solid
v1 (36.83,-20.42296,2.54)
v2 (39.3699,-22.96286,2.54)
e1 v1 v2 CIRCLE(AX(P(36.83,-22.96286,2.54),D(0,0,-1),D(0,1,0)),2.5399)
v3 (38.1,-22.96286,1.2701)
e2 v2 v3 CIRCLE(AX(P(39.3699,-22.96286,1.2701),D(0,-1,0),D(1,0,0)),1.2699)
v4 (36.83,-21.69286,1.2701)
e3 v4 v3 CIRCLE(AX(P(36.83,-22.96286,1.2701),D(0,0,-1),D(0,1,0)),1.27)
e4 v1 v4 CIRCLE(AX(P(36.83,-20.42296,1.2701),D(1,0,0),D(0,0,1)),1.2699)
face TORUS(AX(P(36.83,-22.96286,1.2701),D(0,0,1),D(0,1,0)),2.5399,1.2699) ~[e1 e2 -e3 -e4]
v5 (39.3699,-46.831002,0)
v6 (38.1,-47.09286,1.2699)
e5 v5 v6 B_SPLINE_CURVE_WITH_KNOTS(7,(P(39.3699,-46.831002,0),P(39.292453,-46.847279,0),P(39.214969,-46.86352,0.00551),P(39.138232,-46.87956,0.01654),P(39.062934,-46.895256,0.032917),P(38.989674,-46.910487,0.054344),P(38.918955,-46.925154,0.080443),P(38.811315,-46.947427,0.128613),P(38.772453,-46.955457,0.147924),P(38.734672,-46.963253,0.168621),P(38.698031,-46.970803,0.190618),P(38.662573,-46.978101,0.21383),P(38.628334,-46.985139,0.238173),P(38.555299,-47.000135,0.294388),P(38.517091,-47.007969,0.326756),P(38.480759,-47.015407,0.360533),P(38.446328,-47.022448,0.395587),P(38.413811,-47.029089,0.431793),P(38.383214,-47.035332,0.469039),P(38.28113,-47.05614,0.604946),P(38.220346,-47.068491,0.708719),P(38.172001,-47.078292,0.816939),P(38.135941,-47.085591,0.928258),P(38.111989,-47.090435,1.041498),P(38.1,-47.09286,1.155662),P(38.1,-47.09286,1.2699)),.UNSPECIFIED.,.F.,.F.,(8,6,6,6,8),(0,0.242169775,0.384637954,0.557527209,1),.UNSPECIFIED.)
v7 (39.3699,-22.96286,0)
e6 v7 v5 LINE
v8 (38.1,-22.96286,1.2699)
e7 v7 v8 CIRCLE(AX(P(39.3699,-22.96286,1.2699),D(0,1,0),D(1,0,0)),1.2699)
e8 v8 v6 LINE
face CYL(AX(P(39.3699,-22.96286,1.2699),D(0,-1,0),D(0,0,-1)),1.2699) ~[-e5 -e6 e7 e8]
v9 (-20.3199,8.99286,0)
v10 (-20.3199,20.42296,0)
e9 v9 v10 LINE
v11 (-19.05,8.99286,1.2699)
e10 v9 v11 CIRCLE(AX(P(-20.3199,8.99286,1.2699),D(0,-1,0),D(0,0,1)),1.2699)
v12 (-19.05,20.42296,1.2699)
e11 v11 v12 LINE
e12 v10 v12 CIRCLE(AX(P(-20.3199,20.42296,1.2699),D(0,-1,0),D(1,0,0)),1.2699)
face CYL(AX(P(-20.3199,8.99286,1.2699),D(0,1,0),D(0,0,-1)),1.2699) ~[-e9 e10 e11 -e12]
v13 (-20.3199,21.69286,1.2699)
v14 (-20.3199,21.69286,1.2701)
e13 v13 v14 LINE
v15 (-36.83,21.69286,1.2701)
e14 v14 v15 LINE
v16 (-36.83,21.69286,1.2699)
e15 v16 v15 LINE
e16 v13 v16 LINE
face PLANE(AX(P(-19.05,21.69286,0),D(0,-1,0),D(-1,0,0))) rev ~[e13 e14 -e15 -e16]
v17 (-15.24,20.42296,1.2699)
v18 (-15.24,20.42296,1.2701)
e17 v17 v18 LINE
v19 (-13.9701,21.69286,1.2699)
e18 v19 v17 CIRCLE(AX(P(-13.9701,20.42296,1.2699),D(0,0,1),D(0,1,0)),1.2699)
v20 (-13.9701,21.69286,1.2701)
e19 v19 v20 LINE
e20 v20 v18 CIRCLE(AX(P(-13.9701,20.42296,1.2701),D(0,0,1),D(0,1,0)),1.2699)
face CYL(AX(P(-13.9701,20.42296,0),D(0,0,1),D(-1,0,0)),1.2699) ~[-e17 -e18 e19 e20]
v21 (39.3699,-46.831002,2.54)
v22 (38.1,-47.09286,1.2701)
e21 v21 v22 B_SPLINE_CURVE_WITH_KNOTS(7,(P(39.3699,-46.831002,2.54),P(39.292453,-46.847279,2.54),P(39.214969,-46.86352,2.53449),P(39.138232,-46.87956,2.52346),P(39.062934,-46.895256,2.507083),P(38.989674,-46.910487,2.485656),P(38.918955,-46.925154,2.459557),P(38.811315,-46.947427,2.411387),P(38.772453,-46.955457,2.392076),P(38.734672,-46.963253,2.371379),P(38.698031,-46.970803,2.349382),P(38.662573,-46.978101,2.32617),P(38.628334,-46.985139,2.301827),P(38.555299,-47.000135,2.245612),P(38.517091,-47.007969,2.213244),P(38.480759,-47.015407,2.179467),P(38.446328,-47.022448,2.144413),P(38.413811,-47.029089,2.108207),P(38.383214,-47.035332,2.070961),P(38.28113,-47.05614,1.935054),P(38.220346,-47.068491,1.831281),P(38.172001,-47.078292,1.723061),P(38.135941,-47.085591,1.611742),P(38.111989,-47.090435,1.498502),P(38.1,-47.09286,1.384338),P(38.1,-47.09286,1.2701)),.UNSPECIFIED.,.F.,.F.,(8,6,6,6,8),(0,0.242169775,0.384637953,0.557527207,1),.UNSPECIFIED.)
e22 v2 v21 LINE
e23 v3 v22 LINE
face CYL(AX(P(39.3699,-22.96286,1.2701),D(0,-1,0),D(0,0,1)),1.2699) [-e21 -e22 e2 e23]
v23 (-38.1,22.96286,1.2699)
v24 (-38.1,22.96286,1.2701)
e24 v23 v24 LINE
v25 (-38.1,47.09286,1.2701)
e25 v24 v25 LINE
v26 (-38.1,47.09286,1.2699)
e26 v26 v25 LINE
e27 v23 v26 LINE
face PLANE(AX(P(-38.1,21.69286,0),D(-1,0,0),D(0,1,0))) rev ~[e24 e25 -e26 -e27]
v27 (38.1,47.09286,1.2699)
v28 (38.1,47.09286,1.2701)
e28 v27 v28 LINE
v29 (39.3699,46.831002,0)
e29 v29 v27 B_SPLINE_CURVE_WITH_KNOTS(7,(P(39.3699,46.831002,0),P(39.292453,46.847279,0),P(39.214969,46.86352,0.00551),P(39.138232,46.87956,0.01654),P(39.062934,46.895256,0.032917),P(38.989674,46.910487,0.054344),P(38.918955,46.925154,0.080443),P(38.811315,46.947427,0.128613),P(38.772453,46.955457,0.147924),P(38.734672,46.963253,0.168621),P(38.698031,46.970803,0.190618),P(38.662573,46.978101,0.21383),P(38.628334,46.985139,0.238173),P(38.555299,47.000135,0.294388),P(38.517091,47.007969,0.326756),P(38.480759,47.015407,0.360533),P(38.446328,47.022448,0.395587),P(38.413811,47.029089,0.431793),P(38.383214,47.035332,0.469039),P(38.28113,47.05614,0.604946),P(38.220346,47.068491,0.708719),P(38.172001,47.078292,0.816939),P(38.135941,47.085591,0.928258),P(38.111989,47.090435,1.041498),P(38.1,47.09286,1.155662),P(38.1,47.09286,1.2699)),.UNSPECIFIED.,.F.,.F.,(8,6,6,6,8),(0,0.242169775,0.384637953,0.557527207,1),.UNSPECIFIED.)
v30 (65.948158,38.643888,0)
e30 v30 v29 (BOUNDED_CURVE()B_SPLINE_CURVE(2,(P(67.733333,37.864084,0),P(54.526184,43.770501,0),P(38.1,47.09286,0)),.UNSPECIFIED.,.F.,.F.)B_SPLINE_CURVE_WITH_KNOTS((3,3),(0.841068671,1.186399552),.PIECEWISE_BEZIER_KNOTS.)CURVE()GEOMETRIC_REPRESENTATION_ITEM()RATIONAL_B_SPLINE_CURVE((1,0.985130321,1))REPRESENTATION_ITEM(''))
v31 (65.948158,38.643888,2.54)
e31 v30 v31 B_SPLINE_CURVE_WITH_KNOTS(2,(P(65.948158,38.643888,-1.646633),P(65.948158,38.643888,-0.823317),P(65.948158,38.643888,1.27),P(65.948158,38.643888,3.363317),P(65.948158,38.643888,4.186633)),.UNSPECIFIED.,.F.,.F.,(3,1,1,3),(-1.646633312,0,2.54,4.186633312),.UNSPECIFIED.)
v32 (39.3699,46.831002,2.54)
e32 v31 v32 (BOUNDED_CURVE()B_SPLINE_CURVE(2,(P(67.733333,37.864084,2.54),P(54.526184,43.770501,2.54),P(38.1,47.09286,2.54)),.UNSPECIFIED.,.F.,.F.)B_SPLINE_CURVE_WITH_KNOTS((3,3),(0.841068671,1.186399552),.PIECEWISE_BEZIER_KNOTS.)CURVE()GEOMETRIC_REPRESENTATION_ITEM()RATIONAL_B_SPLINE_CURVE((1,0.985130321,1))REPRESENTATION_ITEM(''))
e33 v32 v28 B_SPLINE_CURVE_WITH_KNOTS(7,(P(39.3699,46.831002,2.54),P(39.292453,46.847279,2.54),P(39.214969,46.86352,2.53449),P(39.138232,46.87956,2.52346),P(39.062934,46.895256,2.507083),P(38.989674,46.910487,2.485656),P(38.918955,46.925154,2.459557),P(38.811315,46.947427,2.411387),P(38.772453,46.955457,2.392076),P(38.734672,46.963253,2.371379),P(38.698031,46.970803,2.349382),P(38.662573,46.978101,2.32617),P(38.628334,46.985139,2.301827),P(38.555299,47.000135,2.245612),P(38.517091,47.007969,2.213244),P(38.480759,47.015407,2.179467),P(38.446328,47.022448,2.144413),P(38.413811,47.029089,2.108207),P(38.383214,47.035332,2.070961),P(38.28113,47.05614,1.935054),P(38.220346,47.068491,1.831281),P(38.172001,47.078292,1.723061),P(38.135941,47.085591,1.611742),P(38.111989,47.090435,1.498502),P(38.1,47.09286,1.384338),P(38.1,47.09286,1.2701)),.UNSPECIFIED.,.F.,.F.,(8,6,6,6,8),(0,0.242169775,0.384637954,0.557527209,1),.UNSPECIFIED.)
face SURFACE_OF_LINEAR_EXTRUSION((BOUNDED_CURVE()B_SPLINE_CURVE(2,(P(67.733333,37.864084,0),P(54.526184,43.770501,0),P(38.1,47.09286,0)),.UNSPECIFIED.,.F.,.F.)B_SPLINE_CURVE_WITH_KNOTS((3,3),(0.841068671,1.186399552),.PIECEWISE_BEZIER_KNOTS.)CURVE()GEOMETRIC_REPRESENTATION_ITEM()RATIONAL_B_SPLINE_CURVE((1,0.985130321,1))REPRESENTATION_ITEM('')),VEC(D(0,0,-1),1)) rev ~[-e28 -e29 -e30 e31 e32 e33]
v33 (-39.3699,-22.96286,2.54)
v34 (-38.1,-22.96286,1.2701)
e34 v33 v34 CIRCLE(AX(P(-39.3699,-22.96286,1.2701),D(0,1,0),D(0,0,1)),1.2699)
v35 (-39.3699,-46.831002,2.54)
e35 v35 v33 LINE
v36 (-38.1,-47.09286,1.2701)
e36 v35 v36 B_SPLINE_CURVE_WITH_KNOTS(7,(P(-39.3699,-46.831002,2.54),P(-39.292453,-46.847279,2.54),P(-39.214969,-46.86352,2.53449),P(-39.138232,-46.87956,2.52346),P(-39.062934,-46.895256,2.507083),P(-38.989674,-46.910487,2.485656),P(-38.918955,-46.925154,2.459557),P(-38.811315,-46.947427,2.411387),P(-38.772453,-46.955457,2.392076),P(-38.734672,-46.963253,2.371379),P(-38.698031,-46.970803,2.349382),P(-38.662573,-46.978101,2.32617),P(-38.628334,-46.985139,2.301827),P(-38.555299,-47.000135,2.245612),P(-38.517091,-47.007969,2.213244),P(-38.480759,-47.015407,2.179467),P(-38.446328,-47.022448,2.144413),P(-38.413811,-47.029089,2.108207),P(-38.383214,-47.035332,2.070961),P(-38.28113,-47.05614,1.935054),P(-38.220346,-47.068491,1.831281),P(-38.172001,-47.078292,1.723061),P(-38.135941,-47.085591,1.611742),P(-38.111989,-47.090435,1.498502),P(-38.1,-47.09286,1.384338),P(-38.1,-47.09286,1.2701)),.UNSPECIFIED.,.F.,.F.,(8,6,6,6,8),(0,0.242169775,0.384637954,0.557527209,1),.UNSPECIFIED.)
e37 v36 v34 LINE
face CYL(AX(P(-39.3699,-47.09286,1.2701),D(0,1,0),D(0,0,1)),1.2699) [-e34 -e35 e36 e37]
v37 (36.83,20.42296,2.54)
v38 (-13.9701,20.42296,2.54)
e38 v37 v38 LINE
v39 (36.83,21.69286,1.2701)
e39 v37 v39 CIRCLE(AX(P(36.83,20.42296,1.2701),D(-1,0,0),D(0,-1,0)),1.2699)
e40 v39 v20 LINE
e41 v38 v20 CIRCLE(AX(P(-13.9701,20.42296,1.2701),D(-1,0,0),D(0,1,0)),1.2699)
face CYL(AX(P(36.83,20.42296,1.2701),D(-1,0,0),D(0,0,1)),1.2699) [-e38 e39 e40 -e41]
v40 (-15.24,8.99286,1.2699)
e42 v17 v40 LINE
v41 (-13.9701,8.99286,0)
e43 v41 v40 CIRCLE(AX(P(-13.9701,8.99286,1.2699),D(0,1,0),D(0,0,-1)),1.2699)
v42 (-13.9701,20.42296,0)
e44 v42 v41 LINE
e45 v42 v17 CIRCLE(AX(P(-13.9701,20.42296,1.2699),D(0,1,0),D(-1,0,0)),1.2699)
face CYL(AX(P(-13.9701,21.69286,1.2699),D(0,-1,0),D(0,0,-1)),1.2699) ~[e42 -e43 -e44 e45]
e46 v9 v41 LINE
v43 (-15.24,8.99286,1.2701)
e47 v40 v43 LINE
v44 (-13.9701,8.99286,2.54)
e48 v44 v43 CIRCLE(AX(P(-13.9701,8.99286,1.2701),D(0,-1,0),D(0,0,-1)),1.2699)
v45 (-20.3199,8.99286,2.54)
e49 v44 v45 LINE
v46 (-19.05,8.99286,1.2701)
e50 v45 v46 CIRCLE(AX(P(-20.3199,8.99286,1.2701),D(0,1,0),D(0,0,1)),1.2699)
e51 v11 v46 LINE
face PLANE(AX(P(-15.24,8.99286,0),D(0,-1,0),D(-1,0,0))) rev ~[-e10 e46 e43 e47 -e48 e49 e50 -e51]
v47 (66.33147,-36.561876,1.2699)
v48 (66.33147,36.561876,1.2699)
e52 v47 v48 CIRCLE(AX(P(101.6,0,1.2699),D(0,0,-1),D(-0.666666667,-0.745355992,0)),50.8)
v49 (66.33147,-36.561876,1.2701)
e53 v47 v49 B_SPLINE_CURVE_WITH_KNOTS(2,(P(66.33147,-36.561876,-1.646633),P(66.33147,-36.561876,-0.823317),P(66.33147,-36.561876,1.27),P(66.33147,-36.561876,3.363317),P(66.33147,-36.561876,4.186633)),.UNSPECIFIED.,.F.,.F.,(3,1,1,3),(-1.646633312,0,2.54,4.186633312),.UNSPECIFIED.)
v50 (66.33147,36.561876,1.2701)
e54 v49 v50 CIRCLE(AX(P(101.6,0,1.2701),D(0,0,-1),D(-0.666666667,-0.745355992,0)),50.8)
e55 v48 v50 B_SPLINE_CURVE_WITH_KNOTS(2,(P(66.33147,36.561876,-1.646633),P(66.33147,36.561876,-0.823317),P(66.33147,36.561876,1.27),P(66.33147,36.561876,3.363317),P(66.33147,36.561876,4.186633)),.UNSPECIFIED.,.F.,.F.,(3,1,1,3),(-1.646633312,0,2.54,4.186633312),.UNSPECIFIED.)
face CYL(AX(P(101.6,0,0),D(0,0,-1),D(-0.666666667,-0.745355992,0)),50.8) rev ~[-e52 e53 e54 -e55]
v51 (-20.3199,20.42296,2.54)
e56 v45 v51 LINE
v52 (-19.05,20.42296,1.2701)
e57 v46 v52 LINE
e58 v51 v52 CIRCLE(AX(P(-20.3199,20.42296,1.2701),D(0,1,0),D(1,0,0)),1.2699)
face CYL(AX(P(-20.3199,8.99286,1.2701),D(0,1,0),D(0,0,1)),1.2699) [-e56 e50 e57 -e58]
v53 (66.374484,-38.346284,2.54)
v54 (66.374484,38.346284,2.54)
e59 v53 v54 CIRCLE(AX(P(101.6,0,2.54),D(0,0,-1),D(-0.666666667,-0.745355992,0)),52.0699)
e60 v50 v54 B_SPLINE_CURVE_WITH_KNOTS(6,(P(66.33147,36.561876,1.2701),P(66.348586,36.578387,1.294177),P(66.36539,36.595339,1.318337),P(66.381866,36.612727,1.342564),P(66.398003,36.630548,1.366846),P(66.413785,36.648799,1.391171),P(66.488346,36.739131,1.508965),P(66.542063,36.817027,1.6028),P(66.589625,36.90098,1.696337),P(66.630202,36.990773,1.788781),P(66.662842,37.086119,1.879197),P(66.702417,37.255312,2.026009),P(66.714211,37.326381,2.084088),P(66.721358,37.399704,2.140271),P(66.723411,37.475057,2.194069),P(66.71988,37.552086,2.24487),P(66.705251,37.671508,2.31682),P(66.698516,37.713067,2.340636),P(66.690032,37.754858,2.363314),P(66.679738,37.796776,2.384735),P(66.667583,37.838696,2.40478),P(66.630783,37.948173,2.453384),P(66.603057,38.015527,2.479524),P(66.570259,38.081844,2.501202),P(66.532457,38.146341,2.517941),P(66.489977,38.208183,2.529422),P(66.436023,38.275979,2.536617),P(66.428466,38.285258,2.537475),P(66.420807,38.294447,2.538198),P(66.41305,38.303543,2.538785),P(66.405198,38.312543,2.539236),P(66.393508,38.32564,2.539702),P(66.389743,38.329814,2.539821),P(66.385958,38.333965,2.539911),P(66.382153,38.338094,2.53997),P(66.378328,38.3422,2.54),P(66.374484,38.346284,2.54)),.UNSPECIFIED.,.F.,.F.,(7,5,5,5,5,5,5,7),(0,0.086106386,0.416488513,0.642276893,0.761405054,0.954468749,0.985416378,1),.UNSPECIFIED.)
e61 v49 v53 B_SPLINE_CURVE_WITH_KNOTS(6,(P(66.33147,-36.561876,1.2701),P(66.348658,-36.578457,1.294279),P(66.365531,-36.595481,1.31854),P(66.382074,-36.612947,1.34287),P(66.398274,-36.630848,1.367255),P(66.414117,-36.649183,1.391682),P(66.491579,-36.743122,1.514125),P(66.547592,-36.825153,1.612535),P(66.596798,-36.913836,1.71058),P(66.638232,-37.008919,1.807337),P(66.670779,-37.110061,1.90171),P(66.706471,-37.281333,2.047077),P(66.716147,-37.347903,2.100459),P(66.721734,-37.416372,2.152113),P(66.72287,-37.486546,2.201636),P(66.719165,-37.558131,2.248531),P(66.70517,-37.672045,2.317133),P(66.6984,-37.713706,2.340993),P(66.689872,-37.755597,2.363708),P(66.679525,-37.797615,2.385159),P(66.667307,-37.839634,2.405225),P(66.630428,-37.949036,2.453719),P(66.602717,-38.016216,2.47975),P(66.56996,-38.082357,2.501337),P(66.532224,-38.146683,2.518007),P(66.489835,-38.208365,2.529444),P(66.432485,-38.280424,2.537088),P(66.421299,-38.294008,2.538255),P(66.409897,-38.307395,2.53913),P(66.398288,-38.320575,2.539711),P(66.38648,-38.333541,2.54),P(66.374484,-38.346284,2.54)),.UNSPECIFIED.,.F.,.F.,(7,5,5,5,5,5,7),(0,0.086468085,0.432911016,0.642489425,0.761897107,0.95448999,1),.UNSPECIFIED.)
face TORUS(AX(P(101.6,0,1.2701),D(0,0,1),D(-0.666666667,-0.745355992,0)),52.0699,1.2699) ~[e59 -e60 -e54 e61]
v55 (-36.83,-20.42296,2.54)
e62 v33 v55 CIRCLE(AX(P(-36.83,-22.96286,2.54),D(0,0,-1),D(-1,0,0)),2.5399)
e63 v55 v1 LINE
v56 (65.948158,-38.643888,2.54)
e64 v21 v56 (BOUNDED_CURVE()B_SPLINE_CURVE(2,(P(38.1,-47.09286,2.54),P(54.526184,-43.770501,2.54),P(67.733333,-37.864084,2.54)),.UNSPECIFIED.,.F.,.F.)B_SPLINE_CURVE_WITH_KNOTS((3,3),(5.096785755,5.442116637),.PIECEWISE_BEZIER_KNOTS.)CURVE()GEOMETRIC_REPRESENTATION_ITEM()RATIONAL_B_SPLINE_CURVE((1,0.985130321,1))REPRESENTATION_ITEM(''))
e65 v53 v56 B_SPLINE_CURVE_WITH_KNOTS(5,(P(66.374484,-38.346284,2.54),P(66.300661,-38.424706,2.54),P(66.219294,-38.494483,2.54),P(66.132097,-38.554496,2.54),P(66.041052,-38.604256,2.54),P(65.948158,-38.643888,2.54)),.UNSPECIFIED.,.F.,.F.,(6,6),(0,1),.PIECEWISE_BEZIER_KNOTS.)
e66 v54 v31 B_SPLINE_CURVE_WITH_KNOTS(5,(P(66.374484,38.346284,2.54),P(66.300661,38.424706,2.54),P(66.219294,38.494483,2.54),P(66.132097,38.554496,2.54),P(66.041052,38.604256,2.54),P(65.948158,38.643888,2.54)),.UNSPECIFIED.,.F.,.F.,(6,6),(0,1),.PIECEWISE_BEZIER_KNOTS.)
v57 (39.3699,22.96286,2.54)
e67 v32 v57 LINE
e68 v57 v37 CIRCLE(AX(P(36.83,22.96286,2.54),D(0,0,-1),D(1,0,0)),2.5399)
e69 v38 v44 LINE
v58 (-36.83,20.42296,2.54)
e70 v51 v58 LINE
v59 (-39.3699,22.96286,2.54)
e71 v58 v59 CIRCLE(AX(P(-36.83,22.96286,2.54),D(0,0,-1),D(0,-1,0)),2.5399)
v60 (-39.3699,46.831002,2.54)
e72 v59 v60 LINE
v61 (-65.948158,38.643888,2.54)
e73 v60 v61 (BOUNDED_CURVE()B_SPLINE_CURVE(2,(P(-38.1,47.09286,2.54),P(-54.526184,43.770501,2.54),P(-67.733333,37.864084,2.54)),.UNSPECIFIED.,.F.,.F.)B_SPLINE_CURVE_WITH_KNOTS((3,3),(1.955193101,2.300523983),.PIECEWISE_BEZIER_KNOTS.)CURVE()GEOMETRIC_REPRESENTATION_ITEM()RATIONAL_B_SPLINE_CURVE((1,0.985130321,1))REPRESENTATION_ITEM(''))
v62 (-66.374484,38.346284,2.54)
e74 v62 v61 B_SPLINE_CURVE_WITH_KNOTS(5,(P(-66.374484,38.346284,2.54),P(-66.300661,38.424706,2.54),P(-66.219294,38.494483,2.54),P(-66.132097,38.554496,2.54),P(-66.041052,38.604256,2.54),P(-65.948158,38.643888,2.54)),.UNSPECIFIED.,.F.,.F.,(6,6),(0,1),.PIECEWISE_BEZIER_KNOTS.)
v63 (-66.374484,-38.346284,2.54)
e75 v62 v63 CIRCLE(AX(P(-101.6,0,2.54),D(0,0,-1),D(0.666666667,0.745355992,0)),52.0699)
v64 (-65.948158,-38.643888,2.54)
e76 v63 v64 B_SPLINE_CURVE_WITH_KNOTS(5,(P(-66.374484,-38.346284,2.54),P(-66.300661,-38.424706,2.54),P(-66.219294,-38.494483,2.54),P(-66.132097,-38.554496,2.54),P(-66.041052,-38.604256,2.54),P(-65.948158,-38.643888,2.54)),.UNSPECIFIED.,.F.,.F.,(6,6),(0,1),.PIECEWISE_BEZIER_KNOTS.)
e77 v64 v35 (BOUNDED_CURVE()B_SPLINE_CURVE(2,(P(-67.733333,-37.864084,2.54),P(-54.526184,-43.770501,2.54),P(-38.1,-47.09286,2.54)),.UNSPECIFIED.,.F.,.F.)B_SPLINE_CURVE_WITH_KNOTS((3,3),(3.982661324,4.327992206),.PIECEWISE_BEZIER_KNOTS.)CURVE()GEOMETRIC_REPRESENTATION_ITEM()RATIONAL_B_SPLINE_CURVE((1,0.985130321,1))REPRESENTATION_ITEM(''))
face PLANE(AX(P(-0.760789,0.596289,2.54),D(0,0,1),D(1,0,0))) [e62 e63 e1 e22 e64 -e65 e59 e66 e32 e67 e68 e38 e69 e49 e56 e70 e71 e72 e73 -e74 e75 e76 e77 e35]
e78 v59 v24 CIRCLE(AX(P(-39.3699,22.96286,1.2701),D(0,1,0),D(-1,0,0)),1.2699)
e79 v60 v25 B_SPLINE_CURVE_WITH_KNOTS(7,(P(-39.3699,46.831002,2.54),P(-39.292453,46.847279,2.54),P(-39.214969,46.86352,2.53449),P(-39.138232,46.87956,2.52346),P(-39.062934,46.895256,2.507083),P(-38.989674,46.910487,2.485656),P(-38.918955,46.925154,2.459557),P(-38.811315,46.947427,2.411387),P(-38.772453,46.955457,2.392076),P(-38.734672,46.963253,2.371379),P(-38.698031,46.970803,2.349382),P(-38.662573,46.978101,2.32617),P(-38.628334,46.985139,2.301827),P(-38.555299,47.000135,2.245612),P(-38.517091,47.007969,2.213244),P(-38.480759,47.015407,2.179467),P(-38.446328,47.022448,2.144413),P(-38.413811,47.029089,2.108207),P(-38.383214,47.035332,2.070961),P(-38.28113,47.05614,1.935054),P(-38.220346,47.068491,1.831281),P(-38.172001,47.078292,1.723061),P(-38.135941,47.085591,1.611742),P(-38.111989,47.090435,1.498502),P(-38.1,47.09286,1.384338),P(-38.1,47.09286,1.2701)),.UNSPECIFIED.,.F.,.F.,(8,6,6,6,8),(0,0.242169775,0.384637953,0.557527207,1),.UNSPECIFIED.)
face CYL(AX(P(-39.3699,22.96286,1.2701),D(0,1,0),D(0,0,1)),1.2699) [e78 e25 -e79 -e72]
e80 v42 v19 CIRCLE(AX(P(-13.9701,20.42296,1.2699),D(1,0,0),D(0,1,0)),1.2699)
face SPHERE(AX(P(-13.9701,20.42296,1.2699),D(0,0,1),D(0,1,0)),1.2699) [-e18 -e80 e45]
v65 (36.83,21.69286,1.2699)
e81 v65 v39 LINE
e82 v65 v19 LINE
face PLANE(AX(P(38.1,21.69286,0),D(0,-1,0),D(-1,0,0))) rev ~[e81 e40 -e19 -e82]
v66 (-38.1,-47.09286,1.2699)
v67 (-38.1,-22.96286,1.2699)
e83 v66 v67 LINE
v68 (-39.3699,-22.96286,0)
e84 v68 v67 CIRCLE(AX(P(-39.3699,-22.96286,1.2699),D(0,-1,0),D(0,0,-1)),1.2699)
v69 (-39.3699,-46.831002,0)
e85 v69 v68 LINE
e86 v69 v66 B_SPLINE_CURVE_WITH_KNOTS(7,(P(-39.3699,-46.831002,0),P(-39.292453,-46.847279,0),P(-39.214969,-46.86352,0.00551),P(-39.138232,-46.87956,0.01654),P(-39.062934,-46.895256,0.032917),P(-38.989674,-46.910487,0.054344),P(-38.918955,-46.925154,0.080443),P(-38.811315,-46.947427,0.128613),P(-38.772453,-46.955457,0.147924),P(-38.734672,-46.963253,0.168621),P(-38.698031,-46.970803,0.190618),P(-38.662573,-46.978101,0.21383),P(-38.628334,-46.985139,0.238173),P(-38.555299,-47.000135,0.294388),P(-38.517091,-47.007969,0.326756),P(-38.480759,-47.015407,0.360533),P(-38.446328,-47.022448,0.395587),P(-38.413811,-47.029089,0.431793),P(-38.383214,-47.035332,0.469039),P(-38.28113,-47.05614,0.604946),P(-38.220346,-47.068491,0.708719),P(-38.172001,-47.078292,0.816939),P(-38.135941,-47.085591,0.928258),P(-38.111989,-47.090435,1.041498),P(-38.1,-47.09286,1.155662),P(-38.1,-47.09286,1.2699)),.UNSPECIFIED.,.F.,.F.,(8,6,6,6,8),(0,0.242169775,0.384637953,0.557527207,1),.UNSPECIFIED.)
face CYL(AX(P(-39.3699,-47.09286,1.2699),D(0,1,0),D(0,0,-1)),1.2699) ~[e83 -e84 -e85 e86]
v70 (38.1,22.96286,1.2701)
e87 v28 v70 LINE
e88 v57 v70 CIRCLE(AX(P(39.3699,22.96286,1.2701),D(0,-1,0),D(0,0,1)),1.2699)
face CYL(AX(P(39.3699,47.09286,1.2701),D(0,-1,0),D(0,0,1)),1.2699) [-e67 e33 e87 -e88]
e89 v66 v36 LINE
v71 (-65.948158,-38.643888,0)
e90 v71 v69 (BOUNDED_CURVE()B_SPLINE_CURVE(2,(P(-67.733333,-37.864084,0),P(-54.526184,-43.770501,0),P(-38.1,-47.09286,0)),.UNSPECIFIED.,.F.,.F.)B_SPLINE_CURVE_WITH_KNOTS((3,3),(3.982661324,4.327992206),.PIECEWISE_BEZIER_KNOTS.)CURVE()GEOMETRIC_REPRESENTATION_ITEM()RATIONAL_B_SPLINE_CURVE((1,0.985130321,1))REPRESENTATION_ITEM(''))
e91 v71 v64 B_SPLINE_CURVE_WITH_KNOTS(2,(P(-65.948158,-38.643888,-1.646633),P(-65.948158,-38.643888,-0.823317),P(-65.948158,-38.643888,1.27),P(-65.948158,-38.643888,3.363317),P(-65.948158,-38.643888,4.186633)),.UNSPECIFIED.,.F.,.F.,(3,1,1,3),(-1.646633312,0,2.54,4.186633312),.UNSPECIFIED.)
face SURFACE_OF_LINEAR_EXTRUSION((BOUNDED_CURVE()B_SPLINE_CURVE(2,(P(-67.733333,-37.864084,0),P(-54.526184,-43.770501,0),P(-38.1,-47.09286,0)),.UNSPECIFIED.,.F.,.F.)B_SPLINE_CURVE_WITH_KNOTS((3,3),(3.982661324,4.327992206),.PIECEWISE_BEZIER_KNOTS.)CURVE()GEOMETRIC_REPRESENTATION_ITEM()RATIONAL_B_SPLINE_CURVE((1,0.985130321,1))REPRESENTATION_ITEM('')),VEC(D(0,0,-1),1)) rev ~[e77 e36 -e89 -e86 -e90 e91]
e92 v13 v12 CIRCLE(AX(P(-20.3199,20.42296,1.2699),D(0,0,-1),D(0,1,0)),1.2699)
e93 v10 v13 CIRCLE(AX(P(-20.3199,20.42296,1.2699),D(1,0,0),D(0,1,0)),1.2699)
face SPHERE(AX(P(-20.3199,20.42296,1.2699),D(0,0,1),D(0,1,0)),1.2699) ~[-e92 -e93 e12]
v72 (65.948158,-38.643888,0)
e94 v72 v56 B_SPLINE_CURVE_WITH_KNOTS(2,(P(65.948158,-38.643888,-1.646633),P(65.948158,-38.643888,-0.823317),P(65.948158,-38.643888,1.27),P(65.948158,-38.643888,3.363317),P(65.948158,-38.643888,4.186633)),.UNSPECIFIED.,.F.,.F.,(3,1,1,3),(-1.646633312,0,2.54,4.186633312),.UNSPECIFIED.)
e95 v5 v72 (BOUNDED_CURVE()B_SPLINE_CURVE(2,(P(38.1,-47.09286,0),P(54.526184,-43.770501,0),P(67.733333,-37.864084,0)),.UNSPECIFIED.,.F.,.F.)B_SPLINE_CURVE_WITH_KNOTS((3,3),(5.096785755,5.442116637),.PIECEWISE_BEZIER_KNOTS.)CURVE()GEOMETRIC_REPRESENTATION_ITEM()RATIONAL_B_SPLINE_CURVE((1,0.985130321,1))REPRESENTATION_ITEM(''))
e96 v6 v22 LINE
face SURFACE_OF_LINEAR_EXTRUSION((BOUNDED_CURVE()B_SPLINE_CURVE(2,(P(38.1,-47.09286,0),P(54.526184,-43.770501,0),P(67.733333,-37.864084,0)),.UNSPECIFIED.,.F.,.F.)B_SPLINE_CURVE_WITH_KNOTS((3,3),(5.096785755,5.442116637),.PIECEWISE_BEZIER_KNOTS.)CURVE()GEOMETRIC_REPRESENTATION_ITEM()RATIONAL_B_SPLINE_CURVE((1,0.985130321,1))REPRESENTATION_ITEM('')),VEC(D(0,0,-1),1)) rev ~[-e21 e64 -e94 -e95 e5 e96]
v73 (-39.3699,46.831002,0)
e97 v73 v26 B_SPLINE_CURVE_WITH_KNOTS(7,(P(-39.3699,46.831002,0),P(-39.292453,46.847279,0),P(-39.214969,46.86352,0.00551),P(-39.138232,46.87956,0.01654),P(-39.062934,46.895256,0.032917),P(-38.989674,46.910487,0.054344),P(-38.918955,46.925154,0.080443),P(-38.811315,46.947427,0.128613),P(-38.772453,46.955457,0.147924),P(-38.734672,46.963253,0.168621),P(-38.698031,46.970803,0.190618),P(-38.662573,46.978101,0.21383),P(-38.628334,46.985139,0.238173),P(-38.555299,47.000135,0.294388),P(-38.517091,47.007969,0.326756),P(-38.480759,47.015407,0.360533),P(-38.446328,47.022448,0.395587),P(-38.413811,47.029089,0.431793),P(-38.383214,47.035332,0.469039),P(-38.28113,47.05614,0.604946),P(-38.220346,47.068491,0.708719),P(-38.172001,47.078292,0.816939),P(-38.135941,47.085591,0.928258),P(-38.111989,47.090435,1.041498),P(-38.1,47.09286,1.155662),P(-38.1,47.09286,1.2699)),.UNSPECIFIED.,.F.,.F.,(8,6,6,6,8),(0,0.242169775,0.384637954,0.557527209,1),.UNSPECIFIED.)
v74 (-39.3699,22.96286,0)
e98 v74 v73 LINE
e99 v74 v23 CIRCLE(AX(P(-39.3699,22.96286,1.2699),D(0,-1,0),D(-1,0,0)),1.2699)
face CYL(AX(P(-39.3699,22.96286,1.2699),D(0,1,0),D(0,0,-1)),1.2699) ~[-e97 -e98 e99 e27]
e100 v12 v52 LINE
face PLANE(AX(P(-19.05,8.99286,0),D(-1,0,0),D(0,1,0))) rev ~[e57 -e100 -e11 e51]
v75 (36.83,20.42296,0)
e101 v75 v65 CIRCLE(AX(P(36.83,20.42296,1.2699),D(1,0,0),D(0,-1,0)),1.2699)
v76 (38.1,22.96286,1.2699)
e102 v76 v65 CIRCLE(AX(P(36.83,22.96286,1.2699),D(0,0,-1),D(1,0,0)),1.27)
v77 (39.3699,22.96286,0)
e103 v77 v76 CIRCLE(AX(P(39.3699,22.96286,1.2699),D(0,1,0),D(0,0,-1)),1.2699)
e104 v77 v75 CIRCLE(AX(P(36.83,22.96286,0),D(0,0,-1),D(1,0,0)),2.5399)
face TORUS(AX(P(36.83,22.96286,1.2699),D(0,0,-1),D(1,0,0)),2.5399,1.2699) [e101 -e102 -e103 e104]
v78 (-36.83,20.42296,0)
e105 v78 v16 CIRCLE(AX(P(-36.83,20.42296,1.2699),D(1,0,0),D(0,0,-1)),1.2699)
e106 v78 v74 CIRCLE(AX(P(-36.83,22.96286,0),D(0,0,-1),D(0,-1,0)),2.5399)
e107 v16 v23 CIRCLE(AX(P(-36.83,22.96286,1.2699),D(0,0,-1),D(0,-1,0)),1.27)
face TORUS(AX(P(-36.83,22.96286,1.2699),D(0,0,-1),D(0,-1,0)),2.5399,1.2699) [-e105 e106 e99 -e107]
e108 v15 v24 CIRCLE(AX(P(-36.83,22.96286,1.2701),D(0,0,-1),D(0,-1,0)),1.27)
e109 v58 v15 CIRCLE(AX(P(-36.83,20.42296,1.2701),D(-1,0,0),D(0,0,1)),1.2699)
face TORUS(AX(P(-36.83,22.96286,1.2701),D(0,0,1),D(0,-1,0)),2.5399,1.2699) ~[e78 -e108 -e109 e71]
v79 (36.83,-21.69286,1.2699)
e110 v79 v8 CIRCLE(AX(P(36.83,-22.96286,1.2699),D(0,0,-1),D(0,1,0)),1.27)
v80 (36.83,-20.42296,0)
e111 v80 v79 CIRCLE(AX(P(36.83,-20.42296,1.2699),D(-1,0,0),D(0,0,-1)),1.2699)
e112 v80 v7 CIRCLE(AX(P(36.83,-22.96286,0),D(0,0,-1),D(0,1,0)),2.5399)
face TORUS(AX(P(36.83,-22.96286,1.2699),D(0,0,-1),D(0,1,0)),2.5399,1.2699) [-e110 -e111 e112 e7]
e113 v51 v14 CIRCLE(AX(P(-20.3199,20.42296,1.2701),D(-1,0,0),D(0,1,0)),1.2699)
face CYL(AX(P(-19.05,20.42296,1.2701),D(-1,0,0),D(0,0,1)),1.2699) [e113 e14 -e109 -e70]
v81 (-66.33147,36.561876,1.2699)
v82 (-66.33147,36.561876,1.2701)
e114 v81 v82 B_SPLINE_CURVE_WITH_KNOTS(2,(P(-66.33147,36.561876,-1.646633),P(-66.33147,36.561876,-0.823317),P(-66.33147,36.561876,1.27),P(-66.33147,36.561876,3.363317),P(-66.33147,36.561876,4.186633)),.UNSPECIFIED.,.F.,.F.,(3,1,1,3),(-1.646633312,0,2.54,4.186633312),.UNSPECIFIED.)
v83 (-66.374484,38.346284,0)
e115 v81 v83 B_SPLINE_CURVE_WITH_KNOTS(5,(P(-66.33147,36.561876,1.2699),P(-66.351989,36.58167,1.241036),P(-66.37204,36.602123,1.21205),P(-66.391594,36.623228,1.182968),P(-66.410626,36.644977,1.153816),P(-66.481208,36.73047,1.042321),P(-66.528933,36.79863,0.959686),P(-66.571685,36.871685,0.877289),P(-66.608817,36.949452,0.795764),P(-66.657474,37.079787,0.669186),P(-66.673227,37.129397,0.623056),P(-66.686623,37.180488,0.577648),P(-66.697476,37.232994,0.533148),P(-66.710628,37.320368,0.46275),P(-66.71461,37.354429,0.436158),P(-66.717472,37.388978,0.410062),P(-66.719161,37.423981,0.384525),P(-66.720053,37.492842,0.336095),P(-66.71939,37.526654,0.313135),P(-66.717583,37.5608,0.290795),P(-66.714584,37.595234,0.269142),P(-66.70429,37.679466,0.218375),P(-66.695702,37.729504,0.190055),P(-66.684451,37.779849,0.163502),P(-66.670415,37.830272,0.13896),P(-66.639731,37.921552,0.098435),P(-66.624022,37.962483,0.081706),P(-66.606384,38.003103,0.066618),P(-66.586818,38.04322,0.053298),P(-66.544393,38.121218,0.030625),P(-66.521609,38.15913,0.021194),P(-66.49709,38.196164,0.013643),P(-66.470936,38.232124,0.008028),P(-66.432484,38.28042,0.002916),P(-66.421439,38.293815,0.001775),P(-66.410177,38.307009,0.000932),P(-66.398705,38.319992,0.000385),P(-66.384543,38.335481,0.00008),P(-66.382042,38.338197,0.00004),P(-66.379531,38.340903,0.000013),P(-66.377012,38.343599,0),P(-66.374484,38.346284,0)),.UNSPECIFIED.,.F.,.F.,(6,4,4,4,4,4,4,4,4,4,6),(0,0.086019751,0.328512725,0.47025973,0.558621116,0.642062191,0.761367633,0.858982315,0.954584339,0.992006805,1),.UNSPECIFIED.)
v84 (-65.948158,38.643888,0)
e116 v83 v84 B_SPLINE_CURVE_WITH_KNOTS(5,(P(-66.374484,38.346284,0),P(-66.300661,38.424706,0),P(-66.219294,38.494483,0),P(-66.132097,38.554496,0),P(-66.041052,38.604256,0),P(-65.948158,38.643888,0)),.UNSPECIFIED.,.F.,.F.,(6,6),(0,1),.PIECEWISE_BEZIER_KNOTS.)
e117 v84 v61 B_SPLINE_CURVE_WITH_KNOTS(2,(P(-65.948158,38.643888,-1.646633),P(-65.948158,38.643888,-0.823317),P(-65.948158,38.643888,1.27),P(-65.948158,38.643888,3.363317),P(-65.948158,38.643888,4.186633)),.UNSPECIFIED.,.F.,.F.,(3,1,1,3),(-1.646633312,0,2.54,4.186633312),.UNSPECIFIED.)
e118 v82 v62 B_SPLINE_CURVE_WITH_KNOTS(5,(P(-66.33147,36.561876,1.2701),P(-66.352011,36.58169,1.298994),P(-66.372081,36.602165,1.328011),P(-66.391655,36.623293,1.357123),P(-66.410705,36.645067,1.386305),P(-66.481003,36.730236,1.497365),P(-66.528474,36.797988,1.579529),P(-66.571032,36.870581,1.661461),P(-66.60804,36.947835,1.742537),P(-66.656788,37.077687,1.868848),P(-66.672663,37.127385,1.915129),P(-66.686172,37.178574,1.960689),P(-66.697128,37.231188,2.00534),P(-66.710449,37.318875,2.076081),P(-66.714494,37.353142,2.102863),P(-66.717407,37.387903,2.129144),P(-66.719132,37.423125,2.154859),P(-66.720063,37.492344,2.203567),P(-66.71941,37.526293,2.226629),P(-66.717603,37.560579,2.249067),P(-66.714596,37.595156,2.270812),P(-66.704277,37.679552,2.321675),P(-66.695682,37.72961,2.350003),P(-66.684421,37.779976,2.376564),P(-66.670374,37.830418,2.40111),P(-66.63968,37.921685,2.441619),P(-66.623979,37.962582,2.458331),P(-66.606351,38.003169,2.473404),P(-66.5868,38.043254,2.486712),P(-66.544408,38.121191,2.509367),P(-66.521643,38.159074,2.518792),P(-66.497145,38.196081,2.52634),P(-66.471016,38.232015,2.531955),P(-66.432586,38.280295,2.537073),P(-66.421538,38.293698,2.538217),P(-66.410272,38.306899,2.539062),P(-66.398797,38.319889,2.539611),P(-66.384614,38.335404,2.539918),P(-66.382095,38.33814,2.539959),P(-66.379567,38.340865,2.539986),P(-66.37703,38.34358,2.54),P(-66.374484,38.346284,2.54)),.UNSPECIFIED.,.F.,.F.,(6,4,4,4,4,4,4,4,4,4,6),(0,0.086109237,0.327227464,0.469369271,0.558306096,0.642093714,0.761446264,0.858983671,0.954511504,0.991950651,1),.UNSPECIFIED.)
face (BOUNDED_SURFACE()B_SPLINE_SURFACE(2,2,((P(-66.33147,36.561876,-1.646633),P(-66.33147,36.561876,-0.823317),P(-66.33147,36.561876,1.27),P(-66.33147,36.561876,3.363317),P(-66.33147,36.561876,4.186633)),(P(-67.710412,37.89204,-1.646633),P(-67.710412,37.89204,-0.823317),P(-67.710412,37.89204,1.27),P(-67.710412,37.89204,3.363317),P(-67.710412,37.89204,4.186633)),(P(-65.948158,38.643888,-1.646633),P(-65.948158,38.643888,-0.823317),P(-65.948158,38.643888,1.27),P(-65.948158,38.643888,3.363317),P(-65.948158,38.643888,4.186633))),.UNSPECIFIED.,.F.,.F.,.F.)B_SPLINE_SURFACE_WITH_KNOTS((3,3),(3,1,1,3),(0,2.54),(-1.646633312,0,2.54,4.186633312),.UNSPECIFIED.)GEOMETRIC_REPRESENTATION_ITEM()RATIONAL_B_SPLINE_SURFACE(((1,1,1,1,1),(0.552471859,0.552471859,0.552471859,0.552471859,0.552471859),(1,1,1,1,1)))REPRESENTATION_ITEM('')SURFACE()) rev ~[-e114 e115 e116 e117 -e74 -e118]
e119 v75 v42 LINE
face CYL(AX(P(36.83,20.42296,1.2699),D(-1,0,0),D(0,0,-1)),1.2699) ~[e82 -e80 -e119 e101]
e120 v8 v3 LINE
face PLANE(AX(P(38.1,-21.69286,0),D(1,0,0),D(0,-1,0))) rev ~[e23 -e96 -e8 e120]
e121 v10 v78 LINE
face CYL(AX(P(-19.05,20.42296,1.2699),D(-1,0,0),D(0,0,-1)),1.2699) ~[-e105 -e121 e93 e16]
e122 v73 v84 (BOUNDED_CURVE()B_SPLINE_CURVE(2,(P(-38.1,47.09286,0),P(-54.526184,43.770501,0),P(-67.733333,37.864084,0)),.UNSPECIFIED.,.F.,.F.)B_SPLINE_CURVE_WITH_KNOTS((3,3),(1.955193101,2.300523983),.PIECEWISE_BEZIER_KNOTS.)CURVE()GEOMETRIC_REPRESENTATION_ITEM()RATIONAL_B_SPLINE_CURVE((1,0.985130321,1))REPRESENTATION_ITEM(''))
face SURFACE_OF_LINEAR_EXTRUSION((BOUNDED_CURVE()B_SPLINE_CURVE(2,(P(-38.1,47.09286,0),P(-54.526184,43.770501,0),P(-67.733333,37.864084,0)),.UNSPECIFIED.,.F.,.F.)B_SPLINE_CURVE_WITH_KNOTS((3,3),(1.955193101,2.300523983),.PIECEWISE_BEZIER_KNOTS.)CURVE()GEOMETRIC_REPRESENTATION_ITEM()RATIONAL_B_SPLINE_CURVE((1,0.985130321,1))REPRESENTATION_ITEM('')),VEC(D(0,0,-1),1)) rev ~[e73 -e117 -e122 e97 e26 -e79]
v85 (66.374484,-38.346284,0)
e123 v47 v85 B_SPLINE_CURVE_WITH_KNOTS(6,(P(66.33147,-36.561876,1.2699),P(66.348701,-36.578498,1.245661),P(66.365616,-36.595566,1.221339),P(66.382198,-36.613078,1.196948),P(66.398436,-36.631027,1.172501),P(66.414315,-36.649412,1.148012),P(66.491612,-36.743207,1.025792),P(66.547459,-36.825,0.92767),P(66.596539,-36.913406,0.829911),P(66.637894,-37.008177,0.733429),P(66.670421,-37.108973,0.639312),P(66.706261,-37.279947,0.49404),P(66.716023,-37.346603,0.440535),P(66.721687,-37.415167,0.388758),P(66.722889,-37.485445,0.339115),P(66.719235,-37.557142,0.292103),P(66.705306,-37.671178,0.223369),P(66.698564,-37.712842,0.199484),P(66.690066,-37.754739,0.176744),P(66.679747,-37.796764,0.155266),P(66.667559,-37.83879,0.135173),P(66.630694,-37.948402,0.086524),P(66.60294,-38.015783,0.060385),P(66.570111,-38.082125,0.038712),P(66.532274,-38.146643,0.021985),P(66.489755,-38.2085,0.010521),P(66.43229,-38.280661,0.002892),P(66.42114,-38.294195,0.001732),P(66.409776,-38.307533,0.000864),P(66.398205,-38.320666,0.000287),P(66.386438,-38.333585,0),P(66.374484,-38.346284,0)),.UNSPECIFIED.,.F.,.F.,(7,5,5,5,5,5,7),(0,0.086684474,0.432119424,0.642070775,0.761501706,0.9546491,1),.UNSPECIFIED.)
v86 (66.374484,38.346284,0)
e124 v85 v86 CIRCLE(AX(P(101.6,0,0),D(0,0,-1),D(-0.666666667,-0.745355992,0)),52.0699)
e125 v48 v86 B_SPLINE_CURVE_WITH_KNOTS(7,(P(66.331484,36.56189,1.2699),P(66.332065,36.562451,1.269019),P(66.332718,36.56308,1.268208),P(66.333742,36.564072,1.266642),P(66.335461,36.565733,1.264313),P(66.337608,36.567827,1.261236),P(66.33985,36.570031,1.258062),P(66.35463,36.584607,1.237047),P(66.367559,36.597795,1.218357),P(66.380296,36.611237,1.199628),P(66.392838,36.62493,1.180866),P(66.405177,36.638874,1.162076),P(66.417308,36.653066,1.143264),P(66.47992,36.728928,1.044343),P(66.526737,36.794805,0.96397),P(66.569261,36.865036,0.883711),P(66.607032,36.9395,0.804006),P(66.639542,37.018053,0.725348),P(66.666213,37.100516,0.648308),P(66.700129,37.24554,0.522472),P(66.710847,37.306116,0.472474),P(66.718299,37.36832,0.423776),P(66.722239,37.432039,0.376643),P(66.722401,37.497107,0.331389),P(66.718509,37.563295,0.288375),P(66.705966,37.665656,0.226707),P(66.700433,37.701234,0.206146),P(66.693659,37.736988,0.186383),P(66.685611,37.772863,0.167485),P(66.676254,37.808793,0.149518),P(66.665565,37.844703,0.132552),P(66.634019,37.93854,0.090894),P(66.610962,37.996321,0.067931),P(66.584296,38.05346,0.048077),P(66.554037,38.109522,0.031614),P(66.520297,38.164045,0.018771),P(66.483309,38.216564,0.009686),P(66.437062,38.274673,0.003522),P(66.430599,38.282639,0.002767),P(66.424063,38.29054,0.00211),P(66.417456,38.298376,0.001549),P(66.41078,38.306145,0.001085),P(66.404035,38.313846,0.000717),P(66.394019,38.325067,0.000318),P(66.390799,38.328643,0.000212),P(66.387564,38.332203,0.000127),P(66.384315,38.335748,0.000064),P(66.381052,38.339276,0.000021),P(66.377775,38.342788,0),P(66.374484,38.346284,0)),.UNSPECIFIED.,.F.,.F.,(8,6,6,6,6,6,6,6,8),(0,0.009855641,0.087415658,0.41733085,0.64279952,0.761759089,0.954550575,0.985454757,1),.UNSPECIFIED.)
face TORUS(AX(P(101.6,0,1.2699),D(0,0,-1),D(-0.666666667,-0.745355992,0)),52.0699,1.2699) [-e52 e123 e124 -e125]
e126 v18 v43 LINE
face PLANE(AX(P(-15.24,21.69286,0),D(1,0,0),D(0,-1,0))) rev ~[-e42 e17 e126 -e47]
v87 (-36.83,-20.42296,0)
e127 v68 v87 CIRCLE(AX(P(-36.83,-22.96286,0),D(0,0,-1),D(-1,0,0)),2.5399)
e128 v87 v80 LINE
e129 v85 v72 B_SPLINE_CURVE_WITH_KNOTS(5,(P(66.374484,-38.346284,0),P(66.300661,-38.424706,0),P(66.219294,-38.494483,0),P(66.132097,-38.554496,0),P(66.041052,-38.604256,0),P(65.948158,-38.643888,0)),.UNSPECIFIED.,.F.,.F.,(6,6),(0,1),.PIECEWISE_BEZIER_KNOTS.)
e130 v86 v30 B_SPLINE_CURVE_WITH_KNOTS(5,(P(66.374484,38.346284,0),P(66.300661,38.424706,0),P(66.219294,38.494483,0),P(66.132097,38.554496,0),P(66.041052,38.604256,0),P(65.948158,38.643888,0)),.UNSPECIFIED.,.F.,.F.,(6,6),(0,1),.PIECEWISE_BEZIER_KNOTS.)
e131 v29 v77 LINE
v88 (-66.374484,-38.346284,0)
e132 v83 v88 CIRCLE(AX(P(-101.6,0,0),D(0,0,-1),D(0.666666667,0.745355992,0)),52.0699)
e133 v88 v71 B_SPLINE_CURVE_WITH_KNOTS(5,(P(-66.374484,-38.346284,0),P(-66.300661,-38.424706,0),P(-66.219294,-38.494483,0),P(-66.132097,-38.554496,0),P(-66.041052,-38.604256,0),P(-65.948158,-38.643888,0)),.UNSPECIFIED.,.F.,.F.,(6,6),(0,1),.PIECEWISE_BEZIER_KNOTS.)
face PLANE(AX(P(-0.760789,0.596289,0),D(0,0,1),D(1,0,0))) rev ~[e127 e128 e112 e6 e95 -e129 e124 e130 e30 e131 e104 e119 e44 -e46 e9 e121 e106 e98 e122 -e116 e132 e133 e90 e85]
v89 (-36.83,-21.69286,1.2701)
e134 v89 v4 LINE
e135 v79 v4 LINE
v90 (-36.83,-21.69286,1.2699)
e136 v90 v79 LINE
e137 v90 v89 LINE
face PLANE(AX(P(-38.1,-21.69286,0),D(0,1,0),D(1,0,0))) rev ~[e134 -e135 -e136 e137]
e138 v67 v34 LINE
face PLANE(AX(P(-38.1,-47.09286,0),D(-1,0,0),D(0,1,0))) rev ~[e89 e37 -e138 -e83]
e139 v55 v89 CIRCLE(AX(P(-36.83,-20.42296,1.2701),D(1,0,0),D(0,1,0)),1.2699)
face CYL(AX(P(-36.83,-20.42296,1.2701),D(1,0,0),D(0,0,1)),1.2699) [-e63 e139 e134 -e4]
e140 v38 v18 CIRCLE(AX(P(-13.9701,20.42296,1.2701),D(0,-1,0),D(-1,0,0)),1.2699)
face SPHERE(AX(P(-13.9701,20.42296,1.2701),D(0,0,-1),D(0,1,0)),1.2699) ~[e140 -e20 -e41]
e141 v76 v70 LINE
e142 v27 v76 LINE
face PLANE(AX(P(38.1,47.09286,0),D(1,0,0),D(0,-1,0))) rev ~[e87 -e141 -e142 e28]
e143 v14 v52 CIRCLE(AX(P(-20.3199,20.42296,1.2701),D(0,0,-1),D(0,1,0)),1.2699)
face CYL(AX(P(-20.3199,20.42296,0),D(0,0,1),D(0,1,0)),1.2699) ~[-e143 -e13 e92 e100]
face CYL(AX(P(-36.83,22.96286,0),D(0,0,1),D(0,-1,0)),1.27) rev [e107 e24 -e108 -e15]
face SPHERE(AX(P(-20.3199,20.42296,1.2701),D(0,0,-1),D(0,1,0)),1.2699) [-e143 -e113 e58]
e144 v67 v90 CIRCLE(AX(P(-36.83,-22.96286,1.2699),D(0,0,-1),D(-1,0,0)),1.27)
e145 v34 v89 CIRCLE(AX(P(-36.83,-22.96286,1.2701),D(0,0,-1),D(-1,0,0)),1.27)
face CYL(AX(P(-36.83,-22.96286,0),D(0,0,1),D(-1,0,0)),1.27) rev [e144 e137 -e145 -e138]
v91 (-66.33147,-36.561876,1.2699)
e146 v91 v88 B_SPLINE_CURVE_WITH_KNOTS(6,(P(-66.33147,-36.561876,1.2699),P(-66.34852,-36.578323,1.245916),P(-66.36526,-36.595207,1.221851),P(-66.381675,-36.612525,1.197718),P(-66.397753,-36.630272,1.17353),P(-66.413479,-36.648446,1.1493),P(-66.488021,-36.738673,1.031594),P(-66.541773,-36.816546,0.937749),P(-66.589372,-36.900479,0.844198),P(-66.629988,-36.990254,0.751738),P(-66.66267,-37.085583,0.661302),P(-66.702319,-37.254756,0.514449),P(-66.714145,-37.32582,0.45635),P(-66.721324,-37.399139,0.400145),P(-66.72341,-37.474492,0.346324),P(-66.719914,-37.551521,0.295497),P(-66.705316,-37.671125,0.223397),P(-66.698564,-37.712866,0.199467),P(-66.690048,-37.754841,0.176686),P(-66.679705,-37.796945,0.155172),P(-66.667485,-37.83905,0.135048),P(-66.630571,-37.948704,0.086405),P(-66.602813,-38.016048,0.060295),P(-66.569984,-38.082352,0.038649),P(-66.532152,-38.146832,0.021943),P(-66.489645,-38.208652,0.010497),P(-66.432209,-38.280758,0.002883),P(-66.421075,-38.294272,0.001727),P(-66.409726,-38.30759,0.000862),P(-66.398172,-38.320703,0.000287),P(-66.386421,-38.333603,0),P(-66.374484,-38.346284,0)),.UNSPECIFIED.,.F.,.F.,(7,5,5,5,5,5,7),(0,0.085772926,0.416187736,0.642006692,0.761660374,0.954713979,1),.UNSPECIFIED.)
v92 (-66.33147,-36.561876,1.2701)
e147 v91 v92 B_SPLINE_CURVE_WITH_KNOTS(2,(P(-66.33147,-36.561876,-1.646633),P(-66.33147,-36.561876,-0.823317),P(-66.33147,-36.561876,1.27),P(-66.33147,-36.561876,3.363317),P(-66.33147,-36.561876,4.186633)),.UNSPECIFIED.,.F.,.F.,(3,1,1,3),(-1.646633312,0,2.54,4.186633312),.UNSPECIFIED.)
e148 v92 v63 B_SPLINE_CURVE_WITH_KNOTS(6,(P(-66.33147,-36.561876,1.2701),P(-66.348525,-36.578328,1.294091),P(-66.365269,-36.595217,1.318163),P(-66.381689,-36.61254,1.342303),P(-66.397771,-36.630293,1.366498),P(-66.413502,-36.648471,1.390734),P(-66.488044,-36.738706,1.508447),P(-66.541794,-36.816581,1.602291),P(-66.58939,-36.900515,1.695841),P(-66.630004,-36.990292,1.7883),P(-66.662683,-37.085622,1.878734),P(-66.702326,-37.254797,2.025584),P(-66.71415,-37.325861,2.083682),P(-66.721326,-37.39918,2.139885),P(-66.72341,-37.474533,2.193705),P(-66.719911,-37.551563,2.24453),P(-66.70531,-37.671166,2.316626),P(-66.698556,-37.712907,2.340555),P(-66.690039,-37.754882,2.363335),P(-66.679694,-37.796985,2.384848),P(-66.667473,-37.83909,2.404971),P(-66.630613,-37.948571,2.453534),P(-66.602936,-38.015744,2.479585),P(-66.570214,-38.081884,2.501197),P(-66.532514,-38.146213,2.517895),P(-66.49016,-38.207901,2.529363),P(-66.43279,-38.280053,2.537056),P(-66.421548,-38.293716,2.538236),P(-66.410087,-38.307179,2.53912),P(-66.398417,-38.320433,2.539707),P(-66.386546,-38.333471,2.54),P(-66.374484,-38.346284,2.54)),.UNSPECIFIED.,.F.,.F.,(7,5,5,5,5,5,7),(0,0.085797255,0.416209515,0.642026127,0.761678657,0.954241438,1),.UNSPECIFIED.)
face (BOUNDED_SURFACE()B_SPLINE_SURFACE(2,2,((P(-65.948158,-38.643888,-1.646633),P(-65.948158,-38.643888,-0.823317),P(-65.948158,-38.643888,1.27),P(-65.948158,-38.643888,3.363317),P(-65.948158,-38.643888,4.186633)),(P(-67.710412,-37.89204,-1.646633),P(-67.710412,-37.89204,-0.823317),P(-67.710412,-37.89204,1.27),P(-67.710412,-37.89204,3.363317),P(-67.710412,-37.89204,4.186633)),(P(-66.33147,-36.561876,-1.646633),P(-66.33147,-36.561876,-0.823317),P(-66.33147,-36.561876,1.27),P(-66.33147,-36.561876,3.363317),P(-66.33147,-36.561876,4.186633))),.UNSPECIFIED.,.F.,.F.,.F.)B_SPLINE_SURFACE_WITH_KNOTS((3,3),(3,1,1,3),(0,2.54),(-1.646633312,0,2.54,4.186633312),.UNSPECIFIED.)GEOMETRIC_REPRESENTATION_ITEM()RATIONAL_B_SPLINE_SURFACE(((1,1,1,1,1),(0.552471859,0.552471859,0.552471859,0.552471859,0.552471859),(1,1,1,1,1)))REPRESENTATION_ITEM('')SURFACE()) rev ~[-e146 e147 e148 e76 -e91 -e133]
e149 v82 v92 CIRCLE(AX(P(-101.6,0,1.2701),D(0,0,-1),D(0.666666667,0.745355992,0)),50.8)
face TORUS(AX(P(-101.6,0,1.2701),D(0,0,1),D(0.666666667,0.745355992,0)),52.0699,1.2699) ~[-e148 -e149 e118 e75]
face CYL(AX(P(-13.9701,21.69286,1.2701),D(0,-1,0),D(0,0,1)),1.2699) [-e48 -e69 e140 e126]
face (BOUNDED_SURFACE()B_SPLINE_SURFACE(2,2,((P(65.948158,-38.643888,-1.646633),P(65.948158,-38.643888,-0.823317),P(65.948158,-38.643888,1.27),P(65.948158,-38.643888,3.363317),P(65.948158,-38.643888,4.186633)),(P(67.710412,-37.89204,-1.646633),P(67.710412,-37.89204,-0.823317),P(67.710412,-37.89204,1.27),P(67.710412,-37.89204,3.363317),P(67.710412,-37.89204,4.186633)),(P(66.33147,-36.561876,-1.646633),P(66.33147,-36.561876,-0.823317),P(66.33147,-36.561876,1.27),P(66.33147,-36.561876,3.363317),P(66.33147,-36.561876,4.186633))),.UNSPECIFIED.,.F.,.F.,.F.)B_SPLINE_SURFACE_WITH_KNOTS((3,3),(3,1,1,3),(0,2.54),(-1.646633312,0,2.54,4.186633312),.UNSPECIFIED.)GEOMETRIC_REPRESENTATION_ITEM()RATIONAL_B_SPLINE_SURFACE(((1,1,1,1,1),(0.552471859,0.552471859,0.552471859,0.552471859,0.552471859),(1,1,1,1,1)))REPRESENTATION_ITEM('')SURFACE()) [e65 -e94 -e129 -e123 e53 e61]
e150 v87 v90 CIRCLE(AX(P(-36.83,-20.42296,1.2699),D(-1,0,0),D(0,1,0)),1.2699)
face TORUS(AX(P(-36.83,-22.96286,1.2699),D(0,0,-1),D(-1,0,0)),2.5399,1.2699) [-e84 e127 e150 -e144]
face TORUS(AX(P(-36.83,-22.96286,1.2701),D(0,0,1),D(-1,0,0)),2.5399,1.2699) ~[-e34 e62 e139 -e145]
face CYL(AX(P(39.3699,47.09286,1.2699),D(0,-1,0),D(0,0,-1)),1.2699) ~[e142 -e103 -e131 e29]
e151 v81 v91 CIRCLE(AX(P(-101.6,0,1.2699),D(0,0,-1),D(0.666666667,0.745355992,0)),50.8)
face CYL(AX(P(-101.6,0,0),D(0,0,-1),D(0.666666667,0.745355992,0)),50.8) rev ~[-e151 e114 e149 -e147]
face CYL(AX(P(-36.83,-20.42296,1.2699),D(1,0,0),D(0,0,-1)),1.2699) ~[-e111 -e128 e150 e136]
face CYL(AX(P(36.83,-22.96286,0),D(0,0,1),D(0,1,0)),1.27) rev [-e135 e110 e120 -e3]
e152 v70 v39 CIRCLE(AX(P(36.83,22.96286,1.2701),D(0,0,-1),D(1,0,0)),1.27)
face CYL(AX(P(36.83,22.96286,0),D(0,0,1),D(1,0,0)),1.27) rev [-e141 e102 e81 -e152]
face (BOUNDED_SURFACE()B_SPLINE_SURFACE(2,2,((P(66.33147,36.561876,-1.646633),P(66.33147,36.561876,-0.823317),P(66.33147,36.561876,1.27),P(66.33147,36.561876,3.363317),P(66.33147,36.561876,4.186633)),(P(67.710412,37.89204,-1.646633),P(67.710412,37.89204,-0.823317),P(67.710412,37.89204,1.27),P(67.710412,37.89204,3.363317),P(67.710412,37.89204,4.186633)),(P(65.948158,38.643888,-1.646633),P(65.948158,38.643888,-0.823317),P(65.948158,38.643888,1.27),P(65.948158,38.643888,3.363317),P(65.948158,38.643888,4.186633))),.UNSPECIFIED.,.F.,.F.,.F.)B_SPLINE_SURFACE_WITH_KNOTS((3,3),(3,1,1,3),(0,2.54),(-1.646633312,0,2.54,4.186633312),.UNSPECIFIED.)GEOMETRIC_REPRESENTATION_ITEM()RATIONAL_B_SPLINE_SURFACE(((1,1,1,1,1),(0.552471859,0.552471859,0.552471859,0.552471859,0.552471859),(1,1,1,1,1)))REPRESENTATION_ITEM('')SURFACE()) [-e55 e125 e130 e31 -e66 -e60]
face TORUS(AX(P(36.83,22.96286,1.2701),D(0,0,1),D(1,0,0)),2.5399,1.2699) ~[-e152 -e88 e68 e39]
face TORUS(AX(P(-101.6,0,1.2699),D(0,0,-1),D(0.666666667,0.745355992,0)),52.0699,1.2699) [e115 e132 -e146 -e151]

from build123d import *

# Parameters (mm, degrees)
F1_DEPTH = 2.54
F2_F1_R  = 1.27
F2_F2_R  = 1.2699


# Not quite as in the source:
# - a fillet or chamfer is up to 0.001 mm smaller than in the source, because OpenCascade refuses the exact size


with BuildPart() as f1:
    # F0 (on Top) → F1 (new body)
    with BuildSketch(Plane.XY):
        with BuildLine():
            ThreePointArc((-50.8, 0), (-55.2261567979, -20.7390131556), (-67.7333333333, -37.864084419))
            add(Edge.make_bspline(
                [(-67.7333333333, -37.864084419), (-54.52618426, -43.7705010424), (-38.1, -47.0928603931)],
                knots=[3.9826613242, 3.9826613242, 3.9826613242, 4.3279922059, 4.3279922059, 4.3279922059], degree=2, weights=[1, 0.9851303208, 1]))
            Line((-38.1, -47.0928603931), (-38.1, -21.6928603931))
            Line((-38.1, -21.6928603931), (38.1, -21.6928603931))
            Line((38.1, -21.6928603931), (38.1, -47.0928603931))
            add(Edge.make_bspline(
                [(38.1, -47.0928603931), (54.52618426, -43.7705010424), (67.7333333333, -37.864084419)],
                knots=[5.0967857549, 5.0967857549, 5.0967857549, 5.4421166366, 5.4421166366, 5.4421166366], degree=2, weights=[1, 0.9851303208, 1]))
            ThreePointArc((67.7333333333, -37.864084419), (55.2261567979, -20.7390131556), (50.8, 0))
            ThreePointArc((50.8, 0), (55.2261567979, 20.7390131556), (67.7333333333, 37.864084419))
            add(Edge.make_bspline(
                [(67.7333333333, 37.864084419), (54.52618426, 43.7705010424), (38.1, 47.0928603931)],
                knots=[0.8410686706, 0.8410686706, 0.8410686706, 1.1863995523, 1.1863995523, 1.1863995523], degree=2, weights=[1, 0.9851303208, 1]))
            Line((38.1, 47.0928603931), (38.1, 21.6928603931))
            Line((38.1, 21.6928603931), (-15.24, 21.6928603931))
            Line((-15.24, 21.6928603931), (-15.24, 8.9928603931))
            Line((-15.24, 8.9928603931), (-19.05, 8.9928603931))
            Line((-19.05, 8.9928603931), (-19.05, 21.6928603931))
            Line((-19.05, 21.6928603931), (-38.1, 21.6928603931))
            Line((-38.1, 21.6928603931), (-38.1, 47.0928603931))
            add(Edge.make_bspline(
                [(-38.1, 47.0928603931), (-54.52618426, 43.7705010424), (-67.7333333333, 37.864084419)],
                knots=[1.9551931013, 1.9551931013, 1.9551931013, 2.300523983, 2.300523983, 2.300523983], degree=2, weights=[1, 0.9851303208, 1]))
            ThreePointArc((-67.7333333333, 37.864084419), (-55.2261567979, 20.7390131556), (-50.8, 0))
        make_face()
    extrude(amount=F1_DEPTH)

    # F2: fillet of radius 1.27 on 24 edges, made by hand

    # F2_f1
    f2_f1_edges = [f1.edges().sort_by_distance(p)[0] for p in [
        (-38.1, -21.6928603931, 1.27),
        (38.1, -21.6928603931, 1.27),
        (38.1, 21.6928603931, 1.27),
        (-38.1, 21.6928603931, 1.27),
    ]]
    fillet(f2_f1_edges, radius=F2_F1_R)

    # F2_f2 (radius 1.27 in the source; OpenCascade refuses exactly that, so slightly less here)
    f2_f2_edges = [f1.edges().sort_by_distance(p)[0] for p in [
        (67.7333333333, -37.864084419, 1.27),
        (50.8, 0, 2.54),
        (67.7333333333, 37.864084419, 1.27),
        (50.8, 0, 0),
        (0, -21.6928603931, 0),
        (0, -21.6928603931, 2.54),
        (-67.7333333333, 37.864084419, 1.27),
        (-50.8, 0, 2.54),
        (-67.7333333333, -37.864084419, 1.27),
        (-50.8, 0, 0),
        (-15.24, 21.6928603931, 1.27),
        (10.795, 21.6928603931, 0),
        (10.795, 21.6928603931, 2.54),
        (-19.05, 21.6928603931, 1.27),
        (-27.94, 21.6928603931, 0),
        (-27.94, 21.6928603931, 2.54),
        (-15.24, 15.3428603931, 2.54),
        (-19.05, 15.3428603931, 2.54),
        (-15.24, 15.3428603931, 0),
        (-19.05, 15.3428603931, 0),
        (-37.7280256121, 22.064834781, 2.54),
        (-37.7280256121, 22.064834781, 0),
        (37.7280256121, 22.064834781, 2.54),
        (37.7280256121, 22.064834781, 0),
        (-37.7280256121, -22.064834781, 2.54),
        (37.7280256121, -22.064834781, 2.54),
        (-37.7280256121, -22.064834781, 0),
        (37.7280256121, -22.064834781, 0),
    ]]
    fillet(f2_f2_edges, radius=F2_F2_R)


solid = f1.part
